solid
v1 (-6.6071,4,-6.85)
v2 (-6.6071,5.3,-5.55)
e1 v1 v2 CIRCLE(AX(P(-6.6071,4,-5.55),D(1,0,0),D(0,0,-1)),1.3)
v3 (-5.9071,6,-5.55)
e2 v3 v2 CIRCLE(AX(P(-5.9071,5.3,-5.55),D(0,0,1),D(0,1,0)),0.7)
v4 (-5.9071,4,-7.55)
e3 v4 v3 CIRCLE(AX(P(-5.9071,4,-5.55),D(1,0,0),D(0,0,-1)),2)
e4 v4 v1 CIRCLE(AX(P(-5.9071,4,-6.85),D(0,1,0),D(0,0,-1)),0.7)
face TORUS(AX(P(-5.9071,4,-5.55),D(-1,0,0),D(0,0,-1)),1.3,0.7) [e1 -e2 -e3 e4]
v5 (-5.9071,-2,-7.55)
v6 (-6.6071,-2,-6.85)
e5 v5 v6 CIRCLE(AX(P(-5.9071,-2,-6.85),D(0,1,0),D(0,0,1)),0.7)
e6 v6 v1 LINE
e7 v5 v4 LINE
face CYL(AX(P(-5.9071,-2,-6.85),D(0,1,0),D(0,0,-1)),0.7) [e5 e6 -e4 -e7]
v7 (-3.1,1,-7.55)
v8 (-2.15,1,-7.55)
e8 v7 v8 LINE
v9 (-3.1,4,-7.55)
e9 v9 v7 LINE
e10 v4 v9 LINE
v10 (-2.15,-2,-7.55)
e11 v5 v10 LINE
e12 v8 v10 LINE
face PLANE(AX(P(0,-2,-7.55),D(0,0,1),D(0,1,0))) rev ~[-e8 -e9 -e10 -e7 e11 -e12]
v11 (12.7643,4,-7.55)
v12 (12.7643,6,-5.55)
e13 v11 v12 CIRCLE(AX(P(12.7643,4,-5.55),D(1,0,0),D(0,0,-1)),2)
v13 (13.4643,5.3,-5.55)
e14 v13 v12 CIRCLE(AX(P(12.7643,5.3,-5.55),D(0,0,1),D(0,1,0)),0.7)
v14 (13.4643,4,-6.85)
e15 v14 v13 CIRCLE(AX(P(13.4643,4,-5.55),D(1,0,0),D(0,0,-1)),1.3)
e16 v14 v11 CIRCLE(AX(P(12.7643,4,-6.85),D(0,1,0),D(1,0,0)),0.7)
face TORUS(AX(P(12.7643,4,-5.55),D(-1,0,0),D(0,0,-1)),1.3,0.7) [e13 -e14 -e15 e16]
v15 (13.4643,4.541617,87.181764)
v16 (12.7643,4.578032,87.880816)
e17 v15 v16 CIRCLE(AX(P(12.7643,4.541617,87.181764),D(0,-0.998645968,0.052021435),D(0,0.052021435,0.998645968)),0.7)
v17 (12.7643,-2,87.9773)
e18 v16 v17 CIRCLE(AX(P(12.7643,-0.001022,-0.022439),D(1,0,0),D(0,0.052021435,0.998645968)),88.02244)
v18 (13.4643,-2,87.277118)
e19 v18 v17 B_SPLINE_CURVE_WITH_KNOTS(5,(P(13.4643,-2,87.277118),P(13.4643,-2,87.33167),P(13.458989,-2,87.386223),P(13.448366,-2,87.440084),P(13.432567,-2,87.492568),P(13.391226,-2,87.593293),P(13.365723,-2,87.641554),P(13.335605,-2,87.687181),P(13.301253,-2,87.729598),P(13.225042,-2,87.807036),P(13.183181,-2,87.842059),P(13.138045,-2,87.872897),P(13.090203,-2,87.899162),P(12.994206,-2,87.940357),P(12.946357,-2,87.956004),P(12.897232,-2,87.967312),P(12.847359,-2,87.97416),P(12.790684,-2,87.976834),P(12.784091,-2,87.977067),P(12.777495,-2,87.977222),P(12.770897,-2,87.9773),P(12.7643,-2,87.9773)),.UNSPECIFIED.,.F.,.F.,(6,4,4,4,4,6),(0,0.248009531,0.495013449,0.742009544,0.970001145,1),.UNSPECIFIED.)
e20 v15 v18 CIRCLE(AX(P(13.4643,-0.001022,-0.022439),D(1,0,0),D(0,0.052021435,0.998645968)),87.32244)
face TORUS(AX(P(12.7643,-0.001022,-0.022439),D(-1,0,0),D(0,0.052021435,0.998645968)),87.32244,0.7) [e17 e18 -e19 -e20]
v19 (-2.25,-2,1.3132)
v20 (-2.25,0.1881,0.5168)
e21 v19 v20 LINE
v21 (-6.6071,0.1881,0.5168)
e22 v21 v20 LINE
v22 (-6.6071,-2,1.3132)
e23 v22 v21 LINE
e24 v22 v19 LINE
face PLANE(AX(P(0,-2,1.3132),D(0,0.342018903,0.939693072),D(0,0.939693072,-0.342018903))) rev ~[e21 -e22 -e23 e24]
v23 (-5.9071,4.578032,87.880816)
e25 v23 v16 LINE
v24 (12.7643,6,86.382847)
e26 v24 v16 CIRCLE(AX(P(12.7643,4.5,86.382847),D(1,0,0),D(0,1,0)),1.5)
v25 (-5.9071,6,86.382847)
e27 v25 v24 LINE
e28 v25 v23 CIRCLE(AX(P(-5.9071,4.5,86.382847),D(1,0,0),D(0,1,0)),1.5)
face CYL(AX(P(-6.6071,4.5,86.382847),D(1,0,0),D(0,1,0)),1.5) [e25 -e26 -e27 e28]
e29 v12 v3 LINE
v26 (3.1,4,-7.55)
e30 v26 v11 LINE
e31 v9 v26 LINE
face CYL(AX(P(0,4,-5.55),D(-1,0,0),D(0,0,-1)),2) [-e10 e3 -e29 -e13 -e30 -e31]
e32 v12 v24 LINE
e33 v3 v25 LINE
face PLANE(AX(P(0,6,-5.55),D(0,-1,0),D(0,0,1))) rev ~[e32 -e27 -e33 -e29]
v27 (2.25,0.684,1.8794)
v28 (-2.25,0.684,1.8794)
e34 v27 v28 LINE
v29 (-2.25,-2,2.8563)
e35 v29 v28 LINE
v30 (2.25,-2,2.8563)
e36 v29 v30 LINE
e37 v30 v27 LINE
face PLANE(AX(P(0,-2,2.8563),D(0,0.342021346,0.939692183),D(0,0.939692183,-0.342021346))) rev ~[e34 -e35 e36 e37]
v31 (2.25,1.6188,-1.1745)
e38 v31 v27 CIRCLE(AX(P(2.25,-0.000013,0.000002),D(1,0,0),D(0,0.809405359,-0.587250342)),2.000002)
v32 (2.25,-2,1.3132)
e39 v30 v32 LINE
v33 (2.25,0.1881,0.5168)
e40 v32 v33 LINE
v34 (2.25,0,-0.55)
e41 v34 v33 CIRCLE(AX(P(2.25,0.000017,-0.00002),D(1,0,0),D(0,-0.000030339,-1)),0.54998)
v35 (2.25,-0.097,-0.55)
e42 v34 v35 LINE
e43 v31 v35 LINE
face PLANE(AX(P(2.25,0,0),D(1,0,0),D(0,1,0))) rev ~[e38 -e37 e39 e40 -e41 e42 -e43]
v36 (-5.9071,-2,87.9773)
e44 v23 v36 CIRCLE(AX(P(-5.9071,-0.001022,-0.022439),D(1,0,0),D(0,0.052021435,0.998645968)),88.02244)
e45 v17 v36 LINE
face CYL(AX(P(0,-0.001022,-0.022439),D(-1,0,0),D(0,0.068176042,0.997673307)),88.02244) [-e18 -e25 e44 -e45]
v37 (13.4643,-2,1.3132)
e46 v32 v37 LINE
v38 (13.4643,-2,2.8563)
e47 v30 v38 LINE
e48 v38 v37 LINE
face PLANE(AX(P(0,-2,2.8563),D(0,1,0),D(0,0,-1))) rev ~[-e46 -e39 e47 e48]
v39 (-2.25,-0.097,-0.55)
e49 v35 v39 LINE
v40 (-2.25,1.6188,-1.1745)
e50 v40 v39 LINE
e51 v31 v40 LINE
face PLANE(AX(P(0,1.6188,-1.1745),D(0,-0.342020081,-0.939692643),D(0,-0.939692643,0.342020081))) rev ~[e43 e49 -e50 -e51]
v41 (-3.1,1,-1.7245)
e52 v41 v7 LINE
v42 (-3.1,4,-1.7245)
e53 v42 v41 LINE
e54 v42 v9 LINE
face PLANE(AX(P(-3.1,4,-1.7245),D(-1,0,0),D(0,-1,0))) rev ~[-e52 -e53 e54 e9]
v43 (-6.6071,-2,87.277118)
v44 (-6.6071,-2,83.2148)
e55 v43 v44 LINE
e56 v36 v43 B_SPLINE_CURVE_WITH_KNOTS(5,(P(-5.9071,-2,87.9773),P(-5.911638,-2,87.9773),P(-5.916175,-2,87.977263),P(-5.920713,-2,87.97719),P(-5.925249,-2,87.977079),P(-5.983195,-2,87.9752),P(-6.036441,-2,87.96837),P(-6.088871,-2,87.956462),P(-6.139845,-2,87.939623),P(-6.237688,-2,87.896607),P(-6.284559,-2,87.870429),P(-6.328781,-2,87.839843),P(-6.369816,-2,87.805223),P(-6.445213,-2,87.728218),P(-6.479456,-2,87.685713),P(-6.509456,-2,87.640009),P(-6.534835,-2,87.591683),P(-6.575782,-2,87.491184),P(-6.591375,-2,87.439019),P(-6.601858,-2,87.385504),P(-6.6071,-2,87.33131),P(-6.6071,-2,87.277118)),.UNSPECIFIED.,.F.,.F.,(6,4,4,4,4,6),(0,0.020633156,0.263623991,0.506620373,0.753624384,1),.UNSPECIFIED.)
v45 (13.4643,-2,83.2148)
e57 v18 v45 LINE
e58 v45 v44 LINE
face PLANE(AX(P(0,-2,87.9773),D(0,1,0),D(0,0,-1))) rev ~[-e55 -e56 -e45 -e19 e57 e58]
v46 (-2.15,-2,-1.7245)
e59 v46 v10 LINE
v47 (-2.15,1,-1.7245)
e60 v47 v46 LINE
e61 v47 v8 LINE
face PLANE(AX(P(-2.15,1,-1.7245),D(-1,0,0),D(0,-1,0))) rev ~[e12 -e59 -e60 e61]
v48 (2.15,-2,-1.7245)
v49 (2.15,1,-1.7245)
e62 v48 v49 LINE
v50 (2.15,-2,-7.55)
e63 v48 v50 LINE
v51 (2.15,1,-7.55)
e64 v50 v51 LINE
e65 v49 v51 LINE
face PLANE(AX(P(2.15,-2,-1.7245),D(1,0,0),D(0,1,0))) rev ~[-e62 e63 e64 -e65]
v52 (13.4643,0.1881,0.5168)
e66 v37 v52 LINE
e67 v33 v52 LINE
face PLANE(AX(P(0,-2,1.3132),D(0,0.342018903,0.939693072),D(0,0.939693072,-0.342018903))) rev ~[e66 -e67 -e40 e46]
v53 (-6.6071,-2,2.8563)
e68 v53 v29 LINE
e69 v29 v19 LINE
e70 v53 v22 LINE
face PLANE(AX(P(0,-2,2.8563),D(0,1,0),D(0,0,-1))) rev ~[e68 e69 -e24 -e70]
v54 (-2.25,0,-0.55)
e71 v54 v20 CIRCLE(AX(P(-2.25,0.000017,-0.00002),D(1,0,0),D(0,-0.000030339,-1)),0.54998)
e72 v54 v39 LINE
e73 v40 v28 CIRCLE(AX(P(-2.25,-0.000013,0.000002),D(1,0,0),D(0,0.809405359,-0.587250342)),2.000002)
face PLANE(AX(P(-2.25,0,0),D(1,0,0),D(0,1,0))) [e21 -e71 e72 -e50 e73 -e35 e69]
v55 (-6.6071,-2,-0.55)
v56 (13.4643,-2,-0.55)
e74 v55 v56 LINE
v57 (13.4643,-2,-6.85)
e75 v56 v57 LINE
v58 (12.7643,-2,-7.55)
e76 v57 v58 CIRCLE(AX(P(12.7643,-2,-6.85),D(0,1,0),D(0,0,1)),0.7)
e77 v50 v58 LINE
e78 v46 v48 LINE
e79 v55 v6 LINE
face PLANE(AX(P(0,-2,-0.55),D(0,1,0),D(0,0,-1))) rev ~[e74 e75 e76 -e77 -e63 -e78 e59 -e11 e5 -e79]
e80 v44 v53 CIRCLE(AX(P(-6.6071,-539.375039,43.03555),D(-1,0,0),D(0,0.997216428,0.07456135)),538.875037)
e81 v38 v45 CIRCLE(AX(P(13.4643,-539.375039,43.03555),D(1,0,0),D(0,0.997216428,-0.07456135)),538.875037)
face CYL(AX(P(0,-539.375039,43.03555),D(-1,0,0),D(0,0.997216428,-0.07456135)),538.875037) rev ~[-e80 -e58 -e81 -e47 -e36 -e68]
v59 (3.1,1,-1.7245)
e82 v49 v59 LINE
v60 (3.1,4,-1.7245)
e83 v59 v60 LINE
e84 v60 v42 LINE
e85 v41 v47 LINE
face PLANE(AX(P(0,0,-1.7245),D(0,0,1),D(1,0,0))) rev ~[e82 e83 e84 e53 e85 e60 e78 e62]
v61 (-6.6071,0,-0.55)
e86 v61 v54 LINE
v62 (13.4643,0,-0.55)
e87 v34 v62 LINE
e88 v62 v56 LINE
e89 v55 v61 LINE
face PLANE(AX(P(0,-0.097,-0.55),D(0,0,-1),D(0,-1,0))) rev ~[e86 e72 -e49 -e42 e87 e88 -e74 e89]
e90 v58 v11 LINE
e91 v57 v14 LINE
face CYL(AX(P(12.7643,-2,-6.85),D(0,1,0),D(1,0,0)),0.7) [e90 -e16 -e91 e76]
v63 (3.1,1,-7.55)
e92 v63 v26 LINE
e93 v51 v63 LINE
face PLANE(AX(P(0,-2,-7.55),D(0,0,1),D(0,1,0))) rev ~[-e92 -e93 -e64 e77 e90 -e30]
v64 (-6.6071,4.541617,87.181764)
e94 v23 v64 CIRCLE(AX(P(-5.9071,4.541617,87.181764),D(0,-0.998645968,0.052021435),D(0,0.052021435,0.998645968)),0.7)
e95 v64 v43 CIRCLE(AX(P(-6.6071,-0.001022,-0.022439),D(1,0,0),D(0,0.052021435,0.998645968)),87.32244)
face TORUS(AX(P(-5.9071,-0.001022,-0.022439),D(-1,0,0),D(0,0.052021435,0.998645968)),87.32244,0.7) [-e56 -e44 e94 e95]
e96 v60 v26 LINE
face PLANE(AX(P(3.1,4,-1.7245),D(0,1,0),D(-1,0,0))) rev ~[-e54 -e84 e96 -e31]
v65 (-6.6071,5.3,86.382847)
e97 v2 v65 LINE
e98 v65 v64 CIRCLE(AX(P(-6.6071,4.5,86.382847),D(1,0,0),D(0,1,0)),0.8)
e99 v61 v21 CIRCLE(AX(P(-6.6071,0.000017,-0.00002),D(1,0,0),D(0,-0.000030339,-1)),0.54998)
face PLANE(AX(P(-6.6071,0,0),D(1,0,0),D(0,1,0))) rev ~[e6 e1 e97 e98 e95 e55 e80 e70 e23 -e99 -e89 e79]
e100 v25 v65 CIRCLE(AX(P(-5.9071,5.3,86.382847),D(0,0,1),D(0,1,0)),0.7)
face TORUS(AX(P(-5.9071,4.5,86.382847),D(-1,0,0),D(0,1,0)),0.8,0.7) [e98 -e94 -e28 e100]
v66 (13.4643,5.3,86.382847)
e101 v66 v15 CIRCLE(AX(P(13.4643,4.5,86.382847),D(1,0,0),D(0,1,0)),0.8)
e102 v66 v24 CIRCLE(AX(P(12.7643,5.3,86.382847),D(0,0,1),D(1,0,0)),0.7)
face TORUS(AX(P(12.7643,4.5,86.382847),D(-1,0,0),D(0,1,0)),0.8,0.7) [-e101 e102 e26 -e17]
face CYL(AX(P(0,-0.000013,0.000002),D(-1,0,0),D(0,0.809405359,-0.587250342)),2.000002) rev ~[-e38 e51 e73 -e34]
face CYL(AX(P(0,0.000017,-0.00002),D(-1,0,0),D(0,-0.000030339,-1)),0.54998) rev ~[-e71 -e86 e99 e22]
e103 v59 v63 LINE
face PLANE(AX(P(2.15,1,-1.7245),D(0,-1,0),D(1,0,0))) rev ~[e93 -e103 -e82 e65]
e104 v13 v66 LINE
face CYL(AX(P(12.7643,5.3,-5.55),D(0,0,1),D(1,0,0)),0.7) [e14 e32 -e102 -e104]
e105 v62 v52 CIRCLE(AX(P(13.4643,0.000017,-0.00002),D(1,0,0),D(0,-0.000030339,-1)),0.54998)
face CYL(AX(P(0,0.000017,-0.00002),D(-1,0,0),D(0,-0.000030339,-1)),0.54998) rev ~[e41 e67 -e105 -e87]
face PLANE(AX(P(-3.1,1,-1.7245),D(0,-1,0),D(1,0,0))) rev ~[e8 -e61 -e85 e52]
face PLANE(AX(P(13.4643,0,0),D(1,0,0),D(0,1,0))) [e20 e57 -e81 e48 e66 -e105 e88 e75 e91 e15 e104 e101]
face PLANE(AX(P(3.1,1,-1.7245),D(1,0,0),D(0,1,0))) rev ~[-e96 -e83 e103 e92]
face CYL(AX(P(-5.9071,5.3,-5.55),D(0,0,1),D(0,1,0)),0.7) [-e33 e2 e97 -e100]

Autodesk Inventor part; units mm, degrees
ref_plane "YZ Plane" through (0, 0, 0) normal (1, 0, 0) x (0, 1, 0)
ref_plane "XZ Plane" through (0, 0, 0) normal (0, 1, 0) x (-1, 0, 0)
ref_plane "Slot Start Plane" through (0, 0, -1.7245) normal (0, 0, 1) x (1, 0, 0)
sketch "Key Profile" plane through (0, 0, 0) normal (1, 0, 0) x (0, 1, 0)
  line L0 (-2, 2.8563) -> (0.684, 1.8794)
  arc A0 (1.6188, -1.1745) -> (0.684, 1.8794) centre (0, 0) ccw
  line L1 (-2, 1.3132) -> (0.1881, 0.5168)
  arc A1 (0, -0.55) -> (0.1881, 0.5168) centre (0, 0) ccw
  line L2 (-2, 2.8563) -> (-2, -0.55)
  line L3 (0, 0) -> (-2, 0) construction
  line L4 (0, -0.55) -> (-2, -0.55)
  line L5 (1.6188, -1.1745) -> (-0.097, -0.55)
  line L6 (6, -5.55) -> (6, 87.7952)
  line L7 (-2, 87.9773) -> (-2, 2.8563)
  arc A2 (6, 87.7952) -> (-2, 87.9773) centre (0, 0) ccw
  line L8 (-2, -0.55) -> (-2, -7.55)
  arc A3 (4, -7.55) -> (6, -5.55) centre (4, -5.55) ccw
  line L9 (-2, -7.55) -> (4, -7.55)
  arc A4 (6, 55.1747) -> (-2, 55.464) centre (0, 0) ccw
  arc A5 (-2, 2.8563) -> (-2, 83.2148) centre (-539.3737, 43.0355) ccw
  point P0 (-0.5, 43.0355)
  point P1 (-0.6441, 55.4963)
  dimension "my_hingeCutRad" = 0.55
  dimension "my_hingeDepth" = 2
  dimension "my_hingeRegCutRad" = 2
  dimension "keyLength" = 88
  dimension "my_KeyHeight" = 8
  dimension "d107" = 20
  dimension "d122" = 4
  dimension "slotOffset" = 1.1745
  dimension "my_backWidth" = 7
  dimension "d128" = 55.5
  dimension "d135" = 1.5
  dimension "d136" = 4.7625
extrude "Upper (u)" add sketch "Key Profile" along normal blind 13.4643 and the other way blind 6.6071 contours A5 A4 L6 A3 L9 L8 L4 L5 A0 L0 | L0 A0 L5 L4 A1 L1 L2
extrude "Lower (d)" add sketch "Key Profile" along normal blind 13.4643 and the other way blind 6.6071 contours A5 L7 A2 L6 A4
extrude "Protrusion Cutout" cut sketch "Key Profile" along normal mid plane 4.5 contours L0 A0 L5 L4 A1 L1 L2
fillet "Front Fillet" radius 1.5 1 edges at (3.4286, 6, 87.7952)
sketch "Slot Sketch" plane through (0, 0, -1.7245) normal (0, 0, 1) x (1, 0, 0)
  line L0 (2.15, -2) -> (2.15, 1)
  line L1 (3.1, 4) -> (-3.1, 4)
  line L2 (-2.15, 1) -> (-2.15, -2)
  line L3 (-2.15, -2) -> (2.15, -2)
  line L4 (0, -2) -> (0, 4) construction
  line L5 (-3.1, 4) -> (-3.1, 1)
  line L6 (-3.1, 1) -> (-2.15, 1)
  line L7 (2.15, 1) -> (3.1, 1)
  line L8 (3.1, 1) -> (3.1, 4)
  point P0 (0, 0)
  dimension "d109" = 2
  dimension "my_slotHeadOffset" = 1
  dimension "my_slotHeadHeight" = 3
  dimension "my_slotHeadWidth" = 6.2
  dimension "my_neckSlotWidth" = 4.3
extrude "Slot" cut sketch "Slot Sketch" against normal through all
fillet "Edge Softening" radius 0.7 10 edges at (13.4643, 5.4142, -6.9642) (13.4643, 1, -7.55) (13.4643, 6, 40.4164) (-6.6071, 5.4142, -6.9642) (-6.6071, 1, -7.55) (-6.6071, 6, 40.4164) (-6.6071, 5.5879, 87.4156) (-6.6071, 1.2899, 87.9905) (13.4643, 5.5879, 87.4156) (13.4643, 1.2899, 87.9905)
equation "\"my_headHeight\" = 3"
equation "\"my_headOffset\" = 1"
equation "\"whiteKeyWidth\" = 20.07143"
properties part number "CKey0_Top"
